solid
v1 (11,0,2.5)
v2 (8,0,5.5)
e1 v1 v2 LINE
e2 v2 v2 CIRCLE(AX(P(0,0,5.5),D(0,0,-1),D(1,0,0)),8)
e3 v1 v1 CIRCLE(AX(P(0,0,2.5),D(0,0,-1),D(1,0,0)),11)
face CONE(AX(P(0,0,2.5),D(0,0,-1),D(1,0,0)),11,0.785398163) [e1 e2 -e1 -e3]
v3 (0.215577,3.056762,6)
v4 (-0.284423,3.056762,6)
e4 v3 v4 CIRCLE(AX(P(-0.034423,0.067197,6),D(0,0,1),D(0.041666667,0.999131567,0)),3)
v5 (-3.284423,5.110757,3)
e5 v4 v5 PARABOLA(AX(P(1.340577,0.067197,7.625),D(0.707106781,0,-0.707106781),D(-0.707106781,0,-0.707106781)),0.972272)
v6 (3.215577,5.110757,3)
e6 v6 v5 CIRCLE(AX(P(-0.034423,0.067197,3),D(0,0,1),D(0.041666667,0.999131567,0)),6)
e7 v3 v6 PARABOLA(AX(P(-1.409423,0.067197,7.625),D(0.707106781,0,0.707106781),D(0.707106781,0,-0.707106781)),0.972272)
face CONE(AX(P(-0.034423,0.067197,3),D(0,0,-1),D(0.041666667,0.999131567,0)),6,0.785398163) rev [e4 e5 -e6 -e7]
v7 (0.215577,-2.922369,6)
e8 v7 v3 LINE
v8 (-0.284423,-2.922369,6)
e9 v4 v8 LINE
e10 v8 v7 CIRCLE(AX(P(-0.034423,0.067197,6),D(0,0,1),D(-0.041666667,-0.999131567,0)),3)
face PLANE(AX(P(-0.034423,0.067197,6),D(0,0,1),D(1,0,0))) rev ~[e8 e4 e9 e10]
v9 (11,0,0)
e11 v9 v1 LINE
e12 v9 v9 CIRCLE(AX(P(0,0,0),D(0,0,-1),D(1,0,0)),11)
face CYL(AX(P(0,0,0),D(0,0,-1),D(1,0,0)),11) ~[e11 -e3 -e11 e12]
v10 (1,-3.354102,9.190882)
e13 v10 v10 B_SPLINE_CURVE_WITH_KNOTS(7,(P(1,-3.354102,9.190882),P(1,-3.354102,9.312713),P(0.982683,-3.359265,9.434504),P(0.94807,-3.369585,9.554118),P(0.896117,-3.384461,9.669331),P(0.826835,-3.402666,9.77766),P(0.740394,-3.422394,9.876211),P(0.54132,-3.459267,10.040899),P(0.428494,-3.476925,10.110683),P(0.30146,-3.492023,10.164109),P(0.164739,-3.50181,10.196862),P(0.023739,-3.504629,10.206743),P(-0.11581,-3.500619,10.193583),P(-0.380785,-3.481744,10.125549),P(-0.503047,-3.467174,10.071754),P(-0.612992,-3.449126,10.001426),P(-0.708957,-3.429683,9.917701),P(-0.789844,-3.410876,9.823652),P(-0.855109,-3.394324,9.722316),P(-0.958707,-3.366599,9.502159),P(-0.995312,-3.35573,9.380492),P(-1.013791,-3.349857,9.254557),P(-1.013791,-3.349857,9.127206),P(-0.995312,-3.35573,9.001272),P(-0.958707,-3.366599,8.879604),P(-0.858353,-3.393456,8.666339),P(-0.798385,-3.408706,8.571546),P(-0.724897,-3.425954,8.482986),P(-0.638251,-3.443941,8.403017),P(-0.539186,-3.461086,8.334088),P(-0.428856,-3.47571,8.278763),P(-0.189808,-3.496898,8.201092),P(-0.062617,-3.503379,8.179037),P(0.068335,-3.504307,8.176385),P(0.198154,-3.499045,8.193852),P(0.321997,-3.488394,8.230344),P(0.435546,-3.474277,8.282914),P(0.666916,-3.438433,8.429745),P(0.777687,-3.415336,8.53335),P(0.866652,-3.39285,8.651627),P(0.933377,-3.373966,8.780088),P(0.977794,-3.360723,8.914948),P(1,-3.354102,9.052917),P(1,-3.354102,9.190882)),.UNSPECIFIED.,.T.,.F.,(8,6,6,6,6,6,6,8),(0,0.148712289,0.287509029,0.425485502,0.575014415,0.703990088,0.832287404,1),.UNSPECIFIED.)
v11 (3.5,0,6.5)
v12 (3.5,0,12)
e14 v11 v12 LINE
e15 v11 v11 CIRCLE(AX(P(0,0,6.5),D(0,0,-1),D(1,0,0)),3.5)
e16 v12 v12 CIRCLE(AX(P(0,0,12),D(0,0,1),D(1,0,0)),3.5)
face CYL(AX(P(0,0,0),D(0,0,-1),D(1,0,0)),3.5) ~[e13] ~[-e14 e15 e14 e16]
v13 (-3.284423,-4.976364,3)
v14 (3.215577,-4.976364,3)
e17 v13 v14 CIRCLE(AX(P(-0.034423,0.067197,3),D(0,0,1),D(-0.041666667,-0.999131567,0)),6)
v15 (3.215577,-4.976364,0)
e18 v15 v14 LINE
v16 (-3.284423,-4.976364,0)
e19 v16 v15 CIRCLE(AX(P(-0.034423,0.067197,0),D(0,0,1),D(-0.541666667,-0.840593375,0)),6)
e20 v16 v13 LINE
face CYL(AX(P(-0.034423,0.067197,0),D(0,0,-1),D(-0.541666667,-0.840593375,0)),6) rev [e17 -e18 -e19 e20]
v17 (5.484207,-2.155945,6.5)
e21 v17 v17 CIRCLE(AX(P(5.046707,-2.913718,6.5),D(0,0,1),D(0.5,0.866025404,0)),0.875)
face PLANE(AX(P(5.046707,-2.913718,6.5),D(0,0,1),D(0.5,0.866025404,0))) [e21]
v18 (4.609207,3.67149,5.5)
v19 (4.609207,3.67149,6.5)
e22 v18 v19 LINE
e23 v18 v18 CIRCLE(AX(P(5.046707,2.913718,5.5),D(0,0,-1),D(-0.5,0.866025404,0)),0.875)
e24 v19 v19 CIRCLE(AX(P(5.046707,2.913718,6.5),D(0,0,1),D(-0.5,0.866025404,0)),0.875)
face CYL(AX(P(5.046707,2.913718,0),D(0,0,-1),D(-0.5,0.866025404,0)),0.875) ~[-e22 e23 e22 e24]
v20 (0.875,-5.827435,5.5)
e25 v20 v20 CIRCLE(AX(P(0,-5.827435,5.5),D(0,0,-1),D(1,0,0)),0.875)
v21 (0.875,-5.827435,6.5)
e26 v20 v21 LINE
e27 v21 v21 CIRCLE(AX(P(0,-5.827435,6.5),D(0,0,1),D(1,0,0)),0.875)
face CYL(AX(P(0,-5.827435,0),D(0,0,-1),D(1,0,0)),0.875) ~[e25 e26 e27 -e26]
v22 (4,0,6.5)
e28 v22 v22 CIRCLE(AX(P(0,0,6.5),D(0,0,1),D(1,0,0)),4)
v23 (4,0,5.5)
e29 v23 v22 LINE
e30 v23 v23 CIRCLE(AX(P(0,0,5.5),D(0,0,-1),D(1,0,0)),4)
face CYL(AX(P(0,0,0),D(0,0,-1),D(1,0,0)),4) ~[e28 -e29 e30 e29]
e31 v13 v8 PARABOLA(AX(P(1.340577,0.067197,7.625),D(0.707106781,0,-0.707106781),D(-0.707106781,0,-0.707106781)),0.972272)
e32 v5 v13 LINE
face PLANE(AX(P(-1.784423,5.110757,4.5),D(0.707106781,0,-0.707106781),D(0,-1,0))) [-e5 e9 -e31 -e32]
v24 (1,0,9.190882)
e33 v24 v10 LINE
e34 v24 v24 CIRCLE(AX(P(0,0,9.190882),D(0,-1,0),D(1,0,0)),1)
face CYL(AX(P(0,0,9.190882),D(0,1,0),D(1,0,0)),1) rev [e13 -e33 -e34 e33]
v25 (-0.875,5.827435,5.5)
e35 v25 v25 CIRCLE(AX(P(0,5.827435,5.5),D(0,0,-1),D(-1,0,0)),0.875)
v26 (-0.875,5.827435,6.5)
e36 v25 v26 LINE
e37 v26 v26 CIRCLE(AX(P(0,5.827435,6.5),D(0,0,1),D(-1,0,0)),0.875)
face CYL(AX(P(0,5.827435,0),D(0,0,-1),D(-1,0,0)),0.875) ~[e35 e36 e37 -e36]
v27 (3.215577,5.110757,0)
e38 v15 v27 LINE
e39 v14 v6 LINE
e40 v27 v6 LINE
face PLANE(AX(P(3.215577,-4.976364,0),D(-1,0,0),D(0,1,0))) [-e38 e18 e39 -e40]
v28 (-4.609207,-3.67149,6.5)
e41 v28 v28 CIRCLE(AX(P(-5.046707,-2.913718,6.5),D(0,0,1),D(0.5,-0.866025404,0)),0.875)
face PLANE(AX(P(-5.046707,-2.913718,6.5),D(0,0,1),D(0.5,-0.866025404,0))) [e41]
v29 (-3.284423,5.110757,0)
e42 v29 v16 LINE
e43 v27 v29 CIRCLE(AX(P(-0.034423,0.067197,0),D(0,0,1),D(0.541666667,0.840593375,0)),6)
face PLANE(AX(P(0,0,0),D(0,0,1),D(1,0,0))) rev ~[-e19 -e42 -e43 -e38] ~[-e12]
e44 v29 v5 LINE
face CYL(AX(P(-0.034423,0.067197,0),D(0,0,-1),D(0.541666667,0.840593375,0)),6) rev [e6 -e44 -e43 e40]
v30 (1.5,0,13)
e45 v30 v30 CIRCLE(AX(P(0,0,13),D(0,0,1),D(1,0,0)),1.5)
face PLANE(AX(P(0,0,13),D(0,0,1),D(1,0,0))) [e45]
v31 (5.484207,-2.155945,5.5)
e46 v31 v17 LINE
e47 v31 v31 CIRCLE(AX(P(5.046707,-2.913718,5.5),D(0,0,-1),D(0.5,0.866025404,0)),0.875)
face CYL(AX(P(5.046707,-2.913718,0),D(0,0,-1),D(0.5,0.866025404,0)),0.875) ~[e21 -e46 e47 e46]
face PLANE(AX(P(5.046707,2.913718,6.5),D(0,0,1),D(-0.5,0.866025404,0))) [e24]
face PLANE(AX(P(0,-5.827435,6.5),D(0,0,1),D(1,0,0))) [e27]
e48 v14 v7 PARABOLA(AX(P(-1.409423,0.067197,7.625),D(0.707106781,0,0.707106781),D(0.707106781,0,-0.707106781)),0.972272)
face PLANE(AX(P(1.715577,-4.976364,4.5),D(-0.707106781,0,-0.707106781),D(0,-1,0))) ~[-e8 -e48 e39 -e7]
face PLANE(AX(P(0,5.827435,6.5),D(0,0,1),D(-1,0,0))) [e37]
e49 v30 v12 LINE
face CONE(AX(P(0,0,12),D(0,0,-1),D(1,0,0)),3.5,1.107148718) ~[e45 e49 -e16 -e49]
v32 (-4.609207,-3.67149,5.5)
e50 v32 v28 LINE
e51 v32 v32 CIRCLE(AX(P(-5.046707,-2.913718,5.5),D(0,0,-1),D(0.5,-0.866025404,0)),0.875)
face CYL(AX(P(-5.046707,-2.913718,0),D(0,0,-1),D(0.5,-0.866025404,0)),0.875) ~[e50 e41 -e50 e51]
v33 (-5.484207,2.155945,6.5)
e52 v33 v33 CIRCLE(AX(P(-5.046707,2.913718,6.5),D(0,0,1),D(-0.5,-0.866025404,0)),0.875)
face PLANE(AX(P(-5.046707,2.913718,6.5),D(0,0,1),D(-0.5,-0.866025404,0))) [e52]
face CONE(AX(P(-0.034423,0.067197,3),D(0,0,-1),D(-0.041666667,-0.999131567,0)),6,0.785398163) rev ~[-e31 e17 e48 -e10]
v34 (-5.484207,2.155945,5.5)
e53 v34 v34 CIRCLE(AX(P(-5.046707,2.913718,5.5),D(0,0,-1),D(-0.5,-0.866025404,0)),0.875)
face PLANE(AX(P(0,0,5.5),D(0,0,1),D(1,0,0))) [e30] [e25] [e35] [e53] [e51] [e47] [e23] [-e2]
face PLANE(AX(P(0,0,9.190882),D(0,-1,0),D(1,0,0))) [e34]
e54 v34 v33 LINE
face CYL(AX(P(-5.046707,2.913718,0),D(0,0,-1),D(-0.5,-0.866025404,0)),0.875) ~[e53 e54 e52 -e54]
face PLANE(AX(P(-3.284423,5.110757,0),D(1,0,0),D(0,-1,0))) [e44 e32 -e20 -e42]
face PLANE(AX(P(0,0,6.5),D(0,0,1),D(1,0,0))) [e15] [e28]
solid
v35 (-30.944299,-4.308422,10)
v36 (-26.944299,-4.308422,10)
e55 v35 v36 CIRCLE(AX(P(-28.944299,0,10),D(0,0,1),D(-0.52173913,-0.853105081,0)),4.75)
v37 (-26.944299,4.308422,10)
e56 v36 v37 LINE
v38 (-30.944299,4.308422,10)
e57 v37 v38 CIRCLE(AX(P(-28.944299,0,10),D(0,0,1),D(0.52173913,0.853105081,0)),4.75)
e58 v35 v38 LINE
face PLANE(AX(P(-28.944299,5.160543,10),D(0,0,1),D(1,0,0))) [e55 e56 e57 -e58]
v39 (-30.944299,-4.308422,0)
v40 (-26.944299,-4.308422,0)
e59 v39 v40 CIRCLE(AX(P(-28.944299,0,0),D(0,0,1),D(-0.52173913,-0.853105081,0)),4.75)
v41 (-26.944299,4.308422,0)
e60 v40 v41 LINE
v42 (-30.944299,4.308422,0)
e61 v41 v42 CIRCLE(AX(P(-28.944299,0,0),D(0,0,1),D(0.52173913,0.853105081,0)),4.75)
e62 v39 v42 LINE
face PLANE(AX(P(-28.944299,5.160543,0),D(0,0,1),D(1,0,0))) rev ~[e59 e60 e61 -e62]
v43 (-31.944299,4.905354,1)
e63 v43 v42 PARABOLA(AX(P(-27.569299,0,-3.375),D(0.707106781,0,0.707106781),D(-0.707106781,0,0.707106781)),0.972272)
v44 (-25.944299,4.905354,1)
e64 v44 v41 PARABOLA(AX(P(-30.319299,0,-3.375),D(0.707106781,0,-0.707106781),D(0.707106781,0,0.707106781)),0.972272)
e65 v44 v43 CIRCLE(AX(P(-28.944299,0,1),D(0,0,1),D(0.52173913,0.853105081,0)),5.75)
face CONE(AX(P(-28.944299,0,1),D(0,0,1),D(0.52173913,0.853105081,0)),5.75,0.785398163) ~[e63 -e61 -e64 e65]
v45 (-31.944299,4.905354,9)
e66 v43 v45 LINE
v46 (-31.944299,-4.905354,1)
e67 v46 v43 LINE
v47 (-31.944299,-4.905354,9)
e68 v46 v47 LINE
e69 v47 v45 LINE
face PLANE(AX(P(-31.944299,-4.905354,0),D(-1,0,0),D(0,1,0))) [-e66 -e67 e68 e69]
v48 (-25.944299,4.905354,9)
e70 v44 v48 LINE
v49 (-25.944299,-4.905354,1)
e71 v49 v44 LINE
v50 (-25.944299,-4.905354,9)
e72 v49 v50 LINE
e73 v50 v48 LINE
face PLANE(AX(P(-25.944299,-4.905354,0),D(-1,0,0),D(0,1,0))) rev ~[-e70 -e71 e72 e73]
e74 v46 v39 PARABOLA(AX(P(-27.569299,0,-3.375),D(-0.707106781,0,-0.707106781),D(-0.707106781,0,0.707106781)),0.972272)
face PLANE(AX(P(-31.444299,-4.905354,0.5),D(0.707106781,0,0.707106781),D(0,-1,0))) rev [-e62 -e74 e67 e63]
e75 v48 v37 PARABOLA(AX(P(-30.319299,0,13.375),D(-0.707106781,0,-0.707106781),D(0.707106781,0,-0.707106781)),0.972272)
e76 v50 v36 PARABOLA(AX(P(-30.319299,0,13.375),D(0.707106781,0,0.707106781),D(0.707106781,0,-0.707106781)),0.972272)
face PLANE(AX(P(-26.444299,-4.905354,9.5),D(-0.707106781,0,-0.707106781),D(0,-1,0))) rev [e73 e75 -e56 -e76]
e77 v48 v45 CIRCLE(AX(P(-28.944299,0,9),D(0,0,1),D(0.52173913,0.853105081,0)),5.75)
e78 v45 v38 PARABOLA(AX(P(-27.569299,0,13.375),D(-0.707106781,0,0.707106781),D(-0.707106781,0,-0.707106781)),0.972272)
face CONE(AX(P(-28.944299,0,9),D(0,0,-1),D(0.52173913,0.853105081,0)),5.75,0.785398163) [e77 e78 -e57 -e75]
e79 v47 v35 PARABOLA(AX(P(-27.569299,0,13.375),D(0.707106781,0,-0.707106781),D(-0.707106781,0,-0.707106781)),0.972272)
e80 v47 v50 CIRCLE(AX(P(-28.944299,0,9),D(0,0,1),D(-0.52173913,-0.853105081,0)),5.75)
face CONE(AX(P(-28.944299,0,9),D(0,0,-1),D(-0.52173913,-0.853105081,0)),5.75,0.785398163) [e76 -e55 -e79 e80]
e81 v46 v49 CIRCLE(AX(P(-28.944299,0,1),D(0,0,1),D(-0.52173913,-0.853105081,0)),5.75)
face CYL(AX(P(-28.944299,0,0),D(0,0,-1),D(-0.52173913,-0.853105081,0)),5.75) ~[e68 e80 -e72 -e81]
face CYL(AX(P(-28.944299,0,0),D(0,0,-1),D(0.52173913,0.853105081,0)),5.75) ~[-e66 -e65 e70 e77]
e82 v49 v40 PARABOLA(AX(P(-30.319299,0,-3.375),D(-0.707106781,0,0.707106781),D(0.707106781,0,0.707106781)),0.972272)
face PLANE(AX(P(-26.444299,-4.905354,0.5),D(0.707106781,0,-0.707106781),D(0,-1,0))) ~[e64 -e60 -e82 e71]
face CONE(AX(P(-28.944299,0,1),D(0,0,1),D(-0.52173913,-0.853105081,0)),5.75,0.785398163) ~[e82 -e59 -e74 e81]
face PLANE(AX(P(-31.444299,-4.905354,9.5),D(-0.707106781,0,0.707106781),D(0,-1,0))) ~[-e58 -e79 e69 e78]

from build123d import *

# Parameters (mm, degrees)
F0_W        = 6
F0_H        = 9.8107084352
F1_DEPTH    = 10
F2_SIZE     = 1
F3_R        = 11
F4_DEPTH    = 5.5
F5_SIZE     = 3
F6_R        = 0.875
F7_DEPTH    = 6.5
F8_COUNT    = 6
F9_R        = 4
F10_DEPTH   = 6.5
F11_R       = 3.5
F12_DEPTH   = 13
F13_SIZE2   = 1
F13_SIZE    = 2
F15_DEPTH   = 6
F16_C1_SIZE = 3
F16_C2_SIZE = 3
F16_C3_SIZE = 3
F16_C4_SIZE = 3
F18_R       = 1
F19_DEPTH   = 4


with BuildPart() as f1:
    # F0 (on Top) → F1 (new body)
    with BuildSketch(Plane.XY):
        with BuildLine():
            Line((-31.9442992674, 4.9053542176), (-25.9442992674, 4.9053542176))
            ThreePointArc((-25.9442992674, 4.9053542176), (-28.9442992674, 5.75), (-31.9442992674, 4.9053542176))
        make_face()
        with Locations((-28.9442992674, 0)):
            Rectangle(F0_W, F0_H)
        with BuildLine():
            ThreePointArc((-31.9442992674, -4.9053542176), (-28.9442992674, -5.75), (-25.9442992674, -4.9053542176))
            Line((-25.9442992674, -4.9053542176), (-31.9442992674, -4.9053542176))
        make_face()
    extrude(amount=F1_DEPTH)

    # F2
    f2_edges = [f1.edges().sort_by_distance(p)[0] for p in [
        (-28.944299, 5.75, 10),
        (-31.944299, 0, 10),
        (-28.944299, -5.75, 10),
        (-25.944299, 0, 10),
        (-28.944299, 5.75, 0),
        (-31.944299, 0, 0),
        (-28.944299, -5.75, 0),
        (-25.944299, 0, 0),
    ]]
    chamfer(f2_edges, length=F2_SIZE)


with BuildPart() as f4:
    # F3 (on Top) → F4 (new body)
    with BuildSketch(Plane.XY):
        Circle(F3_R)
    extrude(amount=F4_DEPTH)

    # F5
    f5_edges = [f4.edges().sort_by_distance(p)[0] for p in [
        (-11, 0, 5.5),
    ]]
    chamfer(f5_edges, length=F5_SIZE)

    # F6 (on Top) → F7 (join)
    with BuildSketch(Plane.XY):
        with Locations((0, -5.8274352923)):
            Circle(F6_R)
    extrude(amount=F7_DEPTH)

    # F8: F4 ×6 about axis
    f8_axis = Axis((0, 0, 5.5), (0, 0, 1))


with BuildPart() as f4_1:
    add(f4.part)
    for i in range(1, F8_COUNT):
        add(f4.part.rotate(f8_axis, i * 360 / F8_COUNT))

    # F9 (on Top) → F10 (join)
    with BuildSketch(Plane.XY):
        Circle(F9_R)
    extrude(amount=F10_DEPTH)

    # F11 (on Top) → F12 (join)
    with BuildSketch(Plane.XY):
        Circle(F11_R)
    extrude(amount=F12_DEPTH)

    # F13
    f13_edges = [f4_1.edges().sort_by_distance(p)[0] for p in [
        (-3.5, 0, 13),
    ]]
    f13_side = f4_1.faces().sort_by_distance((0, 0, 13))[0]
    chamfer(f13_edges, length=F13_SIZE, length2=F13_SIZE2, reference=f13_side)


with BuildPart() as f15:
    # F14 (on Top) → F15 (new body)
    with BuildSketch(Plane.XY):
        with BuildLine():
            Line((-3.2844228611, 5.110756855), (-3.2844228611, -4.976363646))
            ThreePointArc((-3.2844228611, -4.976363646), (-0.0344228611, -5.9328033955), (3.2155771389, -4.976363646))
            Line((3.2155771389, -4.976363646), (3.2155771389, 5.110756855))
            ThreePointArc((3.2155771389, 5.110756855), (-0.0344228611, 6.0671966045), (-3.2844228611, 5.110756855))
        make_face()
    extrude(amount=F15_DEPTH)

    # F16: chamfer of 3 on 4 edges, made by hand

    # F16_c1
    f16_c1_edges = [f15.edges().sort_by_distance(p)[0] for p in [
        (3.2155771389, 0.0671966045, 6),
    ]]
    chamfer(f16_c1_edges, length=F16_C1_SIZE)

    # F16_c2
    f16_c2_edges = [f15.edges().sort_by_distance(p)[0] for p in [
        (-3.2844228611, 0.0671966045, 6),
    ]]
    chamfer(f16_c2_edges, length=F16_C2_SIZE)

    # F16_c3
    f16_c3_edges = [f15.edges().sort_by_distance(p)[0] for p in [
        (-0.0344228611, -5.9328033955, 6),
    ]]
    chamfer(f16_c3_edges, length=F16_C3_SIZE)

    # F16_c4
    f16_c4_edges = [f15.edges().sort_by_distance(p)[0] for p in [
        (-0.0344228611, 6.0671966045, 6),
    ]]
    chamfer(f16_c4_edges, length=F16_C4_SIZE)


with BuildPart() as f4_2:
    add(f4_1.part)

    # F17: cut F15
    add(f15.part, mode=Mode.SUBTRACT)

    # F18 (on Front) → F19 (cut)
    with BuildSketch(Plane.XZ):
        with Locations((0, 9.1908816248)):
            Circle(F18_R)
    extrude(amount=F19_DEPTH, mode=Mode.SUBTRACT)


solid = Compound([f1.part, f4_2.part])
